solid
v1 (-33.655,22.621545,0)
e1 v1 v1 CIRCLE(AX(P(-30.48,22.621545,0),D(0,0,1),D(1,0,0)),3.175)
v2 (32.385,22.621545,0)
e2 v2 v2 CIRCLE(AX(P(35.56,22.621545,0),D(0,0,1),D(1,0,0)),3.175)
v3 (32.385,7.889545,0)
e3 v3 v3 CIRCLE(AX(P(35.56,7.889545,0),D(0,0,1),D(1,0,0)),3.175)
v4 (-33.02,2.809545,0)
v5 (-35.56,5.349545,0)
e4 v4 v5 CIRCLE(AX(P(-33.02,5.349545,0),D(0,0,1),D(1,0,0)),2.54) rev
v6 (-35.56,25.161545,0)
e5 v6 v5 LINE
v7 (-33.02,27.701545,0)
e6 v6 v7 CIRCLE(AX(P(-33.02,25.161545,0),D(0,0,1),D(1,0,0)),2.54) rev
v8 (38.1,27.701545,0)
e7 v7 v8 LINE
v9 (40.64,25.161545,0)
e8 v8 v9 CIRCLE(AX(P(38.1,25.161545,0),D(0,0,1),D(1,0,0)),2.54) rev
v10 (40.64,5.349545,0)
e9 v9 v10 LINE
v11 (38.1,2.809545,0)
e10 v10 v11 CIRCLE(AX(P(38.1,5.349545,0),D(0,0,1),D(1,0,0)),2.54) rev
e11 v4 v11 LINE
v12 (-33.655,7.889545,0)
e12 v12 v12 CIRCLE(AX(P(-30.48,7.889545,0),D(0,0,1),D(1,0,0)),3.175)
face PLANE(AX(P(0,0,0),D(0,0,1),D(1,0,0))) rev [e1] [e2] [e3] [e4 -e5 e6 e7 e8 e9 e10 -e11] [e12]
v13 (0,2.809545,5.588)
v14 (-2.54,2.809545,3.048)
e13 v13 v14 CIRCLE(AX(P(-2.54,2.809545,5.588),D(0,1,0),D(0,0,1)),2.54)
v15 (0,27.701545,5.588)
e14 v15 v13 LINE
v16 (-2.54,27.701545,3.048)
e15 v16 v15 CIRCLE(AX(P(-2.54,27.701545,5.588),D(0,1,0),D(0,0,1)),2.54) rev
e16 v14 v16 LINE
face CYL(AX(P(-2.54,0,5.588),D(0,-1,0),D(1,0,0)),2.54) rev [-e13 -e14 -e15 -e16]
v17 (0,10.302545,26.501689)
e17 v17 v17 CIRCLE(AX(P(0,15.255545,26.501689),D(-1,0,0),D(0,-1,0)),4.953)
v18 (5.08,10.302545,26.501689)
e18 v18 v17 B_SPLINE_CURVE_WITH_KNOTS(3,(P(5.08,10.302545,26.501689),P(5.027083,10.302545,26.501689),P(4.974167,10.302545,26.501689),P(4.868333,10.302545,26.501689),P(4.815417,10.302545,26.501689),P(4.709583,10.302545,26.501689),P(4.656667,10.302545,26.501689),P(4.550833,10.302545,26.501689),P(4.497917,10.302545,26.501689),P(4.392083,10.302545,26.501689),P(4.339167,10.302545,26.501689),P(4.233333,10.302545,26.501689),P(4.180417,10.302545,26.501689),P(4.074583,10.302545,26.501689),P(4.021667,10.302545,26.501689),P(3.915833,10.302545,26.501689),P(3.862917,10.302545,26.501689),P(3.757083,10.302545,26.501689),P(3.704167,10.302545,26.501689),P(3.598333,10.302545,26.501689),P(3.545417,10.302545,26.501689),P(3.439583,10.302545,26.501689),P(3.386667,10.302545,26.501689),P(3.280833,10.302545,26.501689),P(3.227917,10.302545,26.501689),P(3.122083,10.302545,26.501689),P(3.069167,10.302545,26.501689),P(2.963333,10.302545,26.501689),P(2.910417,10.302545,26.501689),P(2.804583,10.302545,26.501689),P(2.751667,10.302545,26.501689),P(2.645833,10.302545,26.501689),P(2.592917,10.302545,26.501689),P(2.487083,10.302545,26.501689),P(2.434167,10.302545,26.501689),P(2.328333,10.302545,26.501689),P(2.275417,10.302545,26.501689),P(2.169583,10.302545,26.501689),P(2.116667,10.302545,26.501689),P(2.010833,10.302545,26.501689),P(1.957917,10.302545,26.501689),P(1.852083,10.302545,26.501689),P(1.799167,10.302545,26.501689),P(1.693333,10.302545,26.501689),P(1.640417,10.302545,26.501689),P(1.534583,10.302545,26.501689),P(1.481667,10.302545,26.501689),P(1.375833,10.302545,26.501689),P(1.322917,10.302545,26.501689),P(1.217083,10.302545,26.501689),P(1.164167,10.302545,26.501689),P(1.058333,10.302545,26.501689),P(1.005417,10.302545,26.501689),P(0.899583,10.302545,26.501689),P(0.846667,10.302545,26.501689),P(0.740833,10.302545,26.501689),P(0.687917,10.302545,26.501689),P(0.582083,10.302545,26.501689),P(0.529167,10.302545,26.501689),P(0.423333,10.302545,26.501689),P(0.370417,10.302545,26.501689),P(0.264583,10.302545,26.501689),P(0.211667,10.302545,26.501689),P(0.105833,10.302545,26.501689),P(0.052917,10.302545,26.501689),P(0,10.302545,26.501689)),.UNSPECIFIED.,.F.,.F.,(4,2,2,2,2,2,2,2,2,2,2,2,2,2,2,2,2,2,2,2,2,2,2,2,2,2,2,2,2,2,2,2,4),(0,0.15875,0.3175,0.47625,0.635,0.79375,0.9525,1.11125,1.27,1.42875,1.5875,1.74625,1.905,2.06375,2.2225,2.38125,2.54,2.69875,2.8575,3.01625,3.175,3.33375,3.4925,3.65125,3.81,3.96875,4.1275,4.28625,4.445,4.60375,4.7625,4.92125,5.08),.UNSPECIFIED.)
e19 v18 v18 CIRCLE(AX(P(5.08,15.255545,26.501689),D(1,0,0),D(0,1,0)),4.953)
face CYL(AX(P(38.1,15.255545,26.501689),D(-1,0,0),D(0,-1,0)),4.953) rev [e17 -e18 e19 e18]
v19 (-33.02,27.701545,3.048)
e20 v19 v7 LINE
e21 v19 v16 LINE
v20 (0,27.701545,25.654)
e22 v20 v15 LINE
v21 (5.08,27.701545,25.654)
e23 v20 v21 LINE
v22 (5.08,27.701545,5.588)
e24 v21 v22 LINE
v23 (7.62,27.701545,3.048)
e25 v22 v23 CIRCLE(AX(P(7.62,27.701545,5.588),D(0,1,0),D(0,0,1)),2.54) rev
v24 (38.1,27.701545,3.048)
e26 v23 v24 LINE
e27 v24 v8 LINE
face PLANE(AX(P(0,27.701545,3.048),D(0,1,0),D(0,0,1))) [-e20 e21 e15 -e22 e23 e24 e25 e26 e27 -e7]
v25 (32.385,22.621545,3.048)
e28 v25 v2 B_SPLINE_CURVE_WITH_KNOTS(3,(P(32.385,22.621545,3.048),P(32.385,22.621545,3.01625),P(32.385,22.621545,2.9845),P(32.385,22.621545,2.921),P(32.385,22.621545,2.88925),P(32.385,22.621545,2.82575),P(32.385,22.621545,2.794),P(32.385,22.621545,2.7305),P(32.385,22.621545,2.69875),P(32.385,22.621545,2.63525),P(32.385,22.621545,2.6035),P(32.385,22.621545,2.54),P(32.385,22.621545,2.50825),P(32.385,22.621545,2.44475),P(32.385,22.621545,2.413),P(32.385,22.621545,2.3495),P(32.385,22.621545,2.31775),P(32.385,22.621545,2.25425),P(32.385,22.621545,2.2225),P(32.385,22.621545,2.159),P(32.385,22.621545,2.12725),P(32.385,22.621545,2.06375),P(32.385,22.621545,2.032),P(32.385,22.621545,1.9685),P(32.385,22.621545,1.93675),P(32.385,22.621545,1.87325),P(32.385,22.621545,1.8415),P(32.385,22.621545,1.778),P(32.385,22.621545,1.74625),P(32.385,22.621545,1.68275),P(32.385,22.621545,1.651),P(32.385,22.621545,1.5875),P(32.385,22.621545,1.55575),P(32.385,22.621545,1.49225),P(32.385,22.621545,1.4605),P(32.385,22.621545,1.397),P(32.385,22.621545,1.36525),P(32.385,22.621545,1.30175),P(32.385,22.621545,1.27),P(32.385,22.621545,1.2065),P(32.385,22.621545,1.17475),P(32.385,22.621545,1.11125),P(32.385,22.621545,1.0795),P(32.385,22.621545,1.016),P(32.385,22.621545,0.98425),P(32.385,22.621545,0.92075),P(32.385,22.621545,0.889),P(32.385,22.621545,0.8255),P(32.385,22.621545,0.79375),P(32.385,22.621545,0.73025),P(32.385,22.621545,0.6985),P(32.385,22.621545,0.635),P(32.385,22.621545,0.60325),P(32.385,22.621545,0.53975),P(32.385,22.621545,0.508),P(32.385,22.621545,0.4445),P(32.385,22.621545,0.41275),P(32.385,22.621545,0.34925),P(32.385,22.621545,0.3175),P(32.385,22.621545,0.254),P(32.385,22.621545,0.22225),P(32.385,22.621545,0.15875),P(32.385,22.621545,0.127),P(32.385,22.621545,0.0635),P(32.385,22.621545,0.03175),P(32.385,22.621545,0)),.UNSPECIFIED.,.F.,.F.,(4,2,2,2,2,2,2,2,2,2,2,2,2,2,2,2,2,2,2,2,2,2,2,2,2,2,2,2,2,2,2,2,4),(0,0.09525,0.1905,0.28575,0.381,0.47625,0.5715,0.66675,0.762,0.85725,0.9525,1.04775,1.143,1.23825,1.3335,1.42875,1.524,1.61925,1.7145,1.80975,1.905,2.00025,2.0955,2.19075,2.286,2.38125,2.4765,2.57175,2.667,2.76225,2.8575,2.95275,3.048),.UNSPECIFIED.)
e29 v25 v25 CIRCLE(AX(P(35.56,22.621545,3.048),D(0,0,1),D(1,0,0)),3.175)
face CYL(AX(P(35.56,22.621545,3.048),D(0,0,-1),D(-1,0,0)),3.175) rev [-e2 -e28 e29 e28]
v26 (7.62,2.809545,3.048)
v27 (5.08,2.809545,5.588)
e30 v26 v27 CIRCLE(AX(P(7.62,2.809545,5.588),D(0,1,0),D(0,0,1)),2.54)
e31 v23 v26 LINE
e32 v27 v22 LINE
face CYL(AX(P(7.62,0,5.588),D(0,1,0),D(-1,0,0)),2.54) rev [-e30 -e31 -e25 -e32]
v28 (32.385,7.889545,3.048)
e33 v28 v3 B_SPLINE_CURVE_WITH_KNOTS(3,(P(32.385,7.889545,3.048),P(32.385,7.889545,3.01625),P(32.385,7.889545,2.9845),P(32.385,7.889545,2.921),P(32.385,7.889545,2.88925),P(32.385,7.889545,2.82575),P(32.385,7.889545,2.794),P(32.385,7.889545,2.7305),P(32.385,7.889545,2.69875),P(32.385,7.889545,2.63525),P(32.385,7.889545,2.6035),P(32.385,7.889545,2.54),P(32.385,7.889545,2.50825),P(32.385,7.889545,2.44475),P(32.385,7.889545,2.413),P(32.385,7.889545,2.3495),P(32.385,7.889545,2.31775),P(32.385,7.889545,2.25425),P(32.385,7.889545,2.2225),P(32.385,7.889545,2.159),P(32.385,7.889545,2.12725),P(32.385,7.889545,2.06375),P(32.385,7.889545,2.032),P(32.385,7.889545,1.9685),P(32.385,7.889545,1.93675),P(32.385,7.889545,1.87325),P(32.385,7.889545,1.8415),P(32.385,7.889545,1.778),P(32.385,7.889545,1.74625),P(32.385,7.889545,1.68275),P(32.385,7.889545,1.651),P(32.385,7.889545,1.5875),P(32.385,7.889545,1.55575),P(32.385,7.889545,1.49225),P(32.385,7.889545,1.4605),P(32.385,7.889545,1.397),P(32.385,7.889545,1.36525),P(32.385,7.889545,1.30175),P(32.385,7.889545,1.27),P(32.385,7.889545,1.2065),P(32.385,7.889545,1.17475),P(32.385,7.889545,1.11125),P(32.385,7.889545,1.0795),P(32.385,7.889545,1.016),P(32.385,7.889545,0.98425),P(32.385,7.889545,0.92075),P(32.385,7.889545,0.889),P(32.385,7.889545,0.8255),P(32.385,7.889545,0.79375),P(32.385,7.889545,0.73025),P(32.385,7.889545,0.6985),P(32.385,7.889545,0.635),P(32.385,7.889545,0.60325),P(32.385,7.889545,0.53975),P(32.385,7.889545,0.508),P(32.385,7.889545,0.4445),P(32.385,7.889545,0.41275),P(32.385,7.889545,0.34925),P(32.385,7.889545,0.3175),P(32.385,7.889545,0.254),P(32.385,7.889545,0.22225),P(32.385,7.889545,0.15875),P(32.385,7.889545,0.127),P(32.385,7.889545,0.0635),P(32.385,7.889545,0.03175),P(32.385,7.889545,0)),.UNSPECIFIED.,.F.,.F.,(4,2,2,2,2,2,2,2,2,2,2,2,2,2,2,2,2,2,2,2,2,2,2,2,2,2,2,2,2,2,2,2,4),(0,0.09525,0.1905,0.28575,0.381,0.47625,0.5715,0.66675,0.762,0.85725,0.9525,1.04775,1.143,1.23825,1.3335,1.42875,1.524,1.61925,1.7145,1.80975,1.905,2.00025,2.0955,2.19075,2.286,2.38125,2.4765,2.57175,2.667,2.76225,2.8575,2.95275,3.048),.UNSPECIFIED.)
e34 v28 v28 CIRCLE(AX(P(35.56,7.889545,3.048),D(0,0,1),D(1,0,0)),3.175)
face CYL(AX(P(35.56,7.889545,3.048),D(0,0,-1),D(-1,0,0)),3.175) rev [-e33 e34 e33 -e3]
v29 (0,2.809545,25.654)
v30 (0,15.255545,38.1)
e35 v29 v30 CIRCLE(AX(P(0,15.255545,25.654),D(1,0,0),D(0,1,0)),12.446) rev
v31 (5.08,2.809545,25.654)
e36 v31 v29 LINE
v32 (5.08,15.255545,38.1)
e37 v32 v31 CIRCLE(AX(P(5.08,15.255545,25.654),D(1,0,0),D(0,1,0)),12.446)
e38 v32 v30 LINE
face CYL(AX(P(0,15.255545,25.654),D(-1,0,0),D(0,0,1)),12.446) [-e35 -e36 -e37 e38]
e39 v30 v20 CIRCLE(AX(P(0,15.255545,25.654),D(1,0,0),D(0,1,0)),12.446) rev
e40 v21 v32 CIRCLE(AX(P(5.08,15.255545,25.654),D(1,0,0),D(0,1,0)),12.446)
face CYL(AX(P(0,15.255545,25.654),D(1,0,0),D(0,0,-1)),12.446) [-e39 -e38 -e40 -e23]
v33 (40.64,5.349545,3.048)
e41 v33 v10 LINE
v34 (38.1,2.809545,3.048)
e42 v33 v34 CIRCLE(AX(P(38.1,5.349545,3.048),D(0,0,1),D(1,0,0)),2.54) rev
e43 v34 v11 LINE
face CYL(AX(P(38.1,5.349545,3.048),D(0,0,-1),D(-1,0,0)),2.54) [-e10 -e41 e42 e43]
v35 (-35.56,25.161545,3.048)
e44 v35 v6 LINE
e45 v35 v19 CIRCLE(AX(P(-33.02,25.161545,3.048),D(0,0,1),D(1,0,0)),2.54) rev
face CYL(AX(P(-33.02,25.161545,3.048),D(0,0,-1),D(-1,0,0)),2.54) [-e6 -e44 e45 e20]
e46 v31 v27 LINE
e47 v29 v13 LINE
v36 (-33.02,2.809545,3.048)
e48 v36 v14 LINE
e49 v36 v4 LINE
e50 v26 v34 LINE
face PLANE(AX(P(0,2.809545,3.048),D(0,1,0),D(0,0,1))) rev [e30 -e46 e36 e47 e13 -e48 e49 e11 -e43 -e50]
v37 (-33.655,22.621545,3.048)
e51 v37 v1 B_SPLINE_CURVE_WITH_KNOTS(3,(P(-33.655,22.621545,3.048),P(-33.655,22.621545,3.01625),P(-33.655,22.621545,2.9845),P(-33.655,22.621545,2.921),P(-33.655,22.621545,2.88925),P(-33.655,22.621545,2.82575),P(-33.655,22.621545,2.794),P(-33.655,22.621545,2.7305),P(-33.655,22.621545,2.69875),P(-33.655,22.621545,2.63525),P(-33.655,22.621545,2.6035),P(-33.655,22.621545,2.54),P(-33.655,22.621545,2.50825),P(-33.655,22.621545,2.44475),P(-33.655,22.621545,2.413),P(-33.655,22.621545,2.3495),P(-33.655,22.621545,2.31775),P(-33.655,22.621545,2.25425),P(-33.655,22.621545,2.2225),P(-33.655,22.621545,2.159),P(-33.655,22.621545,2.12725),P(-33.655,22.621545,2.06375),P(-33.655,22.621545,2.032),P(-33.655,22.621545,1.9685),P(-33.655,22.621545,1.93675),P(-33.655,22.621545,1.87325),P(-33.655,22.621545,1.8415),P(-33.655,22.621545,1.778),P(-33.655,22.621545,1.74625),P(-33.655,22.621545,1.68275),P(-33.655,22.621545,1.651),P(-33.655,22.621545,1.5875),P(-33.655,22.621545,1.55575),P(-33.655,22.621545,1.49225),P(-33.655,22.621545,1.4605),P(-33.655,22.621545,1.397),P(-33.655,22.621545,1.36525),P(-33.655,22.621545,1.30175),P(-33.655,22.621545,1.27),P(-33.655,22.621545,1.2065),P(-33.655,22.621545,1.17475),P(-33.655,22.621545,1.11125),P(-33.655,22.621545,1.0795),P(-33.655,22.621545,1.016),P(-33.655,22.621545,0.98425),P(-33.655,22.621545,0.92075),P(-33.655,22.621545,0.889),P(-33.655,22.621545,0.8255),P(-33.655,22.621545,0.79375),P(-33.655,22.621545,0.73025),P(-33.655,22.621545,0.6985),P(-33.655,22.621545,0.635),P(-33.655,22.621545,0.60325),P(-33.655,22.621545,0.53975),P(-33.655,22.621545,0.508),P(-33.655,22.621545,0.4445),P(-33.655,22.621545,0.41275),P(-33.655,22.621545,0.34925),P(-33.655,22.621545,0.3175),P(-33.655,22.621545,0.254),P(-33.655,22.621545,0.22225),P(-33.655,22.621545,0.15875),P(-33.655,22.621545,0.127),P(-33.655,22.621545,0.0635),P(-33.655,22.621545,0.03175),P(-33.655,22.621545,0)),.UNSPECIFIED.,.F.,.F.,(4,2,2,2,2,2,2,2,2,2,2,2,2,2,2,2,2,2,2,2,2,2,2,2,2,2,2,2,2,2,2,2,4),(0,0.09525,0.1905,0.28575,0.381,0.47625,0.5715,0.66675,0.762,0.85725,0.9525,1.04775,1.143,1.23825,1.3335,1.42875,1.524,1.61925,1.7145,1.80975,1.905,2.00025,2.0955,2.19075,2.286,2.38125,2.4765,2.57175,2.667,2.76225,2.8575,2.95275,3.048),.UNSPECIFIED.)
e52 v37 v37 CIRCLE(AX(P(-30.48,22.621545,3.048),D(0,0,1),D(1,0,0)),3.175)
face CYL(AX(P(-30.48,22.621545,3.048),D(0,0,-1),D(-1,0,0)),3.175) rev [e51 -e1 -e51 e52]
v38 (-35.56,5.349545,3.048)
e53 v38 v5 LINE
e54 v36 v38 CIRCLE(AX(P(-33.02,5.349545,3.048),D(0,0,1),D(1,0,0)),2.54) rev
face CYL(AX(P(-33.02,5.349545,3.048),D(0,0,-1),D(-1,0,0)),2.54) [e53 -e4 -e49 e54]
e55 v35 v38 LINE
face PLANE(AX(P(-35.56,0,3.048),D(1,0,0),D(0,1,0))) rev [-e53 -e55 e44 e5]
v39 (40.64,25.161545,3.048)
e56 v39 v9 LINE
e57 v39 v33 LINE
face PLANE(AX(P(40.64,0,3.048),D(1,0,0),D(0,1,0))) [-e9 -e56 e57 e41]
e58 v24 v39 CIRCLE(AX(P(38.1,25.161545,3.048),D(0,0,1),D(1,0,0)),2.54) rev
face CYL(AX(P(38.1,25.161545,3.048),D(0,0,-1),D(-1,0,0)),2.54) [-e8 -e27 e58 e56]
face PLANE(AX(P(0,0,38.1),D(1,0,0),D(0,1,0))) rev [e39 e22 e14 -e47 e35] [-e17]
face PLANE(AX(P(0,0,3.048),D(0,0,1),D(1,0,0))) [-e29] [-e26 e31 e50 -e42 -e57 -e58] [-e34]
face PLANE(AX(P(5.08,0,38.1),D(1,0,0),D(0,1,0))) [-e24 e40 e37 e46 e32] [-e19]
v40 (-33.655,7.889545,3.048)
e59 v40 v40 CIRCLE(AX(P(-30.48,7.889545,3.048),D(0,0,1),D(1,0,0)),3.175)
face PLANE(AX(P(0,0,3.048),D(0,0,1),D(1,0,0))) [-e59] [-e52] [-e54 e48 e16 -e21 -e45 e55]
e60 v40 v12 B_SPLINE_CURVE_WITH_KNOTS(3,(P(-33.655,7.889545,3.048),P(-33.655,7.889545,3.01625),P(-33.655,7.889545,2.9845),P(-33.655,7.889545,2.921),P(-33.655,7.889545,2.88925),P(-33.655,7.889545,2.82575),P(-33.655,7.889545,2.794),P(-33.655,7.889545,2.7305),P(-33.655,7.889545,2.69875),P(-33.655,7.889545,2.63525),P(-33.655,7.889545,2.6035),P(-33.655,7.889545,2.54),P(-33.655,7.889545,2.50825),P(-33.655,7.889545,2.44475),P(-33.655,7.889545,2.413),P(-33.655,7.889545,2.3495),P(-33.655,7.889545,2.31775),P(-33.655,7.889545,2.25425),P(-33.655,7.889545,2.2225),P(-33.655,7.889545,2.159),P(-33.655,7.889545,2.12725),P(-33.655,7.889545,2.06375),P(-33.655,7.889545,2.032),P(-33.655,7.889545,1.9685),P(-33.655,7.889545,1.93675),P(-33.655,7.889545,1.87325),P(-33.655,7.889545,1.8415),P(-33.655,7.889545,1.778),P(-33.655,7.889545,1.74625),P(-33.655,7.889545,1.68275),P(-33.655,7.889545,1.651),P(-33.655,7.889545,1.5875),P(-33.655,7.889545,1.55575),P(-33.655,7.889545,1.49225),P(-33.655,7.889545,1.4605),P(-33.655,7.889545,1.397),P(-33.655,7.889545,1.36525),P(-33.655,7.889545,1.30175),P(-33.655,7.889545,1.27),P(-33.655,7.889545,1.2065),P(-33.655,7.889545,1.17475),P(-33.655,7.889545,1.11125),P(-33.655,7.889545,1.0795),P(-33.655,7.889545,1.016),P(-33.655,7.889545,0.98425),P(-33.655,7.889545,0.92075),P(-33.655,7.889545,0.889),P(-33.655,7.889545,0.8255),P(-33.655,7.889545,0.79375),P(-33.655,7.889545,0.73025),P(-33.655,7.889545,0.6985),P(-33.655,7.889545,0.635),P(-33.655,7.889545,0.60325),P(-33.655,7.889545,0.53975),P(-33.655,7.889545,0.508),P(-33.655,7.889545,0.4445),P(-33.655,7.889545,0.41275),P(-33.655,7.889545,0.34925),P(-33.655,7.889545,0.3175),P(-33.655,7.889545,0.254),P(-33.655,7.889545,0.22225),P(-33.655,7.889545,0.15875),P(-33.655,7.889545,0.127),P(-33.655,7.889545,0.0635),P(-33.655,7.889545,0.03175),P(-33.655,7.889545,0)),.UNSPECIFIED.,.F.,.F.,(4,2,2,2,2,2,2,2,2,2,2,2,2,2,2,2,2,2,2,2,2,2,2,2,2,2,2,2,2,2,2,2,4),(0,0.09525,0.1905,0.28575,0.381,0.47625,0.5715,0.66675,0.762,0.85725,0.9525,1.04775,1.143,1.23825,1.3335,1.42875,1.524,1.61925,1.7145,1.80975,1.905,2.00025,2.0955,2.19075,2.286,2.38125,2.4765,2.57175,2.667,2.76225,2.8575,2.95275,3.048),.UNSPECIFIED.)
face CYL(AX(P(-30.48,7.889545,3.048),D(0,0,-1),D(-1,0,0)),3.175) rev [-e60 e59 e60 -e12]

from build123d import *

# Parameters (mm, degrees)
SKETCH1_R             = 3.175
BOSS_EXTRUDE9_DEPTH   = 3.048
BOSS_EXTRUDE9_2_DEPTH = 3.048
SKETCH1_17_W          = 5.08
SKETCH1_17_H          = 24.892
BOSS_EXTRUDE10_DEPTH  = 38.1
FILLET3_R             = 2.54
FILLET4_R             = 2.54
FILLET6_R             = 12.446
SKETCH2_R             = 4.953
CUT_EXTRUDE1_DEPTH    = 38.1


with BuildPart() as part:
    # Sketch1 → Boss-Extrude9 (new body)
    with BuildSketch(Plane.XY):
        with BuildLine():
            Line((0, 2.809544612), (0, 27.701544612))
            Line((0, 27.701544612), (-33.02, 27.701544612))
            ThreePointArc((-33.02, 27.701544612), (-34.816051224, 26.957595836), (-35.56, 25.161544612))
            Line((-35.56, 25.161544612), (-35.56, 5.349544612))
            ThreePointArc((-35.56, 5.349544612), (-34.816051224, 3.553493388), (-33.02, 2.809544612))
            Line((-33.02, 2.809544612), (0, 2.809544612))
        make_face()
        with Locations(Location((-30.48, 7.889544612, 0), (0, 0, 180))):
            Circle(SKETCH1_R, mode=Mode.SUBTRACT)
        with Locations(Location((-30.48, 22.621544612, 0), (0, 0, 180))):
            Circle(SKETCH1_R, mode=Mode.SUBTRACT)
    extrude(amount=BOSS_EXTRUDE9_DEPTH)



with BuildPart() as body_2:
    # Sketch1 → Boss-Extrude9 2 (new body)
    with BuildSketch(Plane.XY):
        with BuildLine():
            Line((38.1, 27.701544612), (5.08, 27.701544612))
            Line((5.08, 27.701544612), (5.08, 2.809544612))
            Line((5.08, 2.809544612), (38.1, 2.809544612))
            ThreePointArc((38.1, 2.809544612), (39.896051224, 3.553493388), (40.64, 5.349544612))
            Line((40.64, 5.349544612), (40.64, 25.161544612))
            ThreePointArc((40.64, 25.161544612), (39.896051224, 26.957595836), (38.1, 27.701544612))
        make_face()
        with Locations(Location((35.56, 7.889544612, 0), (0, 0, 180))):
            Circle(SKETCH1_R, mode=Mode.SUBTRACT)
        with Locations(Location((35.56, 22.621544612, 0), (0, 0, 180))):
            Circle(SKETCH1_R, mode=Mode.SUBTRACT)
    extrude(amount=BOSS_EXTRUDE9_2_DEPTH)


with BuildPart() as part_1:
    add(part.part)

    add(body_2.part)  # Boss-Extrude10 merges body 2
    # Sketch1<17> → Boss-Extrude10 (add)
    with BuildSketch(Plane.XY):
        with Locations((2.54, 15.255544612)):
            Rectangle(SKETCH1_17_W, SKETCH1_17_H)
    extrude(amount=BOSS_EXTRUDE10_DEPTH)

    # Fillet3
    fillet3_edges = [part_1.edges().sort_by_distance(p)[0] for p in [
        (5.08, 15.255544612, 3.048),
    ]]
    fillet(fillet3_edges, radius=FILLET3_R)

    # Fillet4
    fillet4_edges = [part_1.edges().sort_by_distance(p)[0] for p in [
        (0, 15.255544612, 3.048),
    ]]
    fillet(fillet4_edges, radius=FILLET4_R)

    # Fillet6
    fillet6_edges = [part_1.edges().sort_by_distance(p)[0] for p in [
        (2.54, 2.809544612, 38.1),
        (2.54, 27.701544612, 38.1),
    ]]
    fillet(fillet6_edges, radius=FILLET6_R - 0.0001)  # a hair under: the kernel refuses the full size

    # Sketch2 → Cut-Extrude1 (cut)
    with BuildSketch(Plane.ZY):
        with Locations(Location((26.501688995, 15.255544612, 0), (0, 0, 270))):
            Circle(SKETCH2_R)
    extrude(amount=-CUT_EXTRUDE1_DEPTH, mode=Mode.SUBTRACT)


solid = part_1.part
